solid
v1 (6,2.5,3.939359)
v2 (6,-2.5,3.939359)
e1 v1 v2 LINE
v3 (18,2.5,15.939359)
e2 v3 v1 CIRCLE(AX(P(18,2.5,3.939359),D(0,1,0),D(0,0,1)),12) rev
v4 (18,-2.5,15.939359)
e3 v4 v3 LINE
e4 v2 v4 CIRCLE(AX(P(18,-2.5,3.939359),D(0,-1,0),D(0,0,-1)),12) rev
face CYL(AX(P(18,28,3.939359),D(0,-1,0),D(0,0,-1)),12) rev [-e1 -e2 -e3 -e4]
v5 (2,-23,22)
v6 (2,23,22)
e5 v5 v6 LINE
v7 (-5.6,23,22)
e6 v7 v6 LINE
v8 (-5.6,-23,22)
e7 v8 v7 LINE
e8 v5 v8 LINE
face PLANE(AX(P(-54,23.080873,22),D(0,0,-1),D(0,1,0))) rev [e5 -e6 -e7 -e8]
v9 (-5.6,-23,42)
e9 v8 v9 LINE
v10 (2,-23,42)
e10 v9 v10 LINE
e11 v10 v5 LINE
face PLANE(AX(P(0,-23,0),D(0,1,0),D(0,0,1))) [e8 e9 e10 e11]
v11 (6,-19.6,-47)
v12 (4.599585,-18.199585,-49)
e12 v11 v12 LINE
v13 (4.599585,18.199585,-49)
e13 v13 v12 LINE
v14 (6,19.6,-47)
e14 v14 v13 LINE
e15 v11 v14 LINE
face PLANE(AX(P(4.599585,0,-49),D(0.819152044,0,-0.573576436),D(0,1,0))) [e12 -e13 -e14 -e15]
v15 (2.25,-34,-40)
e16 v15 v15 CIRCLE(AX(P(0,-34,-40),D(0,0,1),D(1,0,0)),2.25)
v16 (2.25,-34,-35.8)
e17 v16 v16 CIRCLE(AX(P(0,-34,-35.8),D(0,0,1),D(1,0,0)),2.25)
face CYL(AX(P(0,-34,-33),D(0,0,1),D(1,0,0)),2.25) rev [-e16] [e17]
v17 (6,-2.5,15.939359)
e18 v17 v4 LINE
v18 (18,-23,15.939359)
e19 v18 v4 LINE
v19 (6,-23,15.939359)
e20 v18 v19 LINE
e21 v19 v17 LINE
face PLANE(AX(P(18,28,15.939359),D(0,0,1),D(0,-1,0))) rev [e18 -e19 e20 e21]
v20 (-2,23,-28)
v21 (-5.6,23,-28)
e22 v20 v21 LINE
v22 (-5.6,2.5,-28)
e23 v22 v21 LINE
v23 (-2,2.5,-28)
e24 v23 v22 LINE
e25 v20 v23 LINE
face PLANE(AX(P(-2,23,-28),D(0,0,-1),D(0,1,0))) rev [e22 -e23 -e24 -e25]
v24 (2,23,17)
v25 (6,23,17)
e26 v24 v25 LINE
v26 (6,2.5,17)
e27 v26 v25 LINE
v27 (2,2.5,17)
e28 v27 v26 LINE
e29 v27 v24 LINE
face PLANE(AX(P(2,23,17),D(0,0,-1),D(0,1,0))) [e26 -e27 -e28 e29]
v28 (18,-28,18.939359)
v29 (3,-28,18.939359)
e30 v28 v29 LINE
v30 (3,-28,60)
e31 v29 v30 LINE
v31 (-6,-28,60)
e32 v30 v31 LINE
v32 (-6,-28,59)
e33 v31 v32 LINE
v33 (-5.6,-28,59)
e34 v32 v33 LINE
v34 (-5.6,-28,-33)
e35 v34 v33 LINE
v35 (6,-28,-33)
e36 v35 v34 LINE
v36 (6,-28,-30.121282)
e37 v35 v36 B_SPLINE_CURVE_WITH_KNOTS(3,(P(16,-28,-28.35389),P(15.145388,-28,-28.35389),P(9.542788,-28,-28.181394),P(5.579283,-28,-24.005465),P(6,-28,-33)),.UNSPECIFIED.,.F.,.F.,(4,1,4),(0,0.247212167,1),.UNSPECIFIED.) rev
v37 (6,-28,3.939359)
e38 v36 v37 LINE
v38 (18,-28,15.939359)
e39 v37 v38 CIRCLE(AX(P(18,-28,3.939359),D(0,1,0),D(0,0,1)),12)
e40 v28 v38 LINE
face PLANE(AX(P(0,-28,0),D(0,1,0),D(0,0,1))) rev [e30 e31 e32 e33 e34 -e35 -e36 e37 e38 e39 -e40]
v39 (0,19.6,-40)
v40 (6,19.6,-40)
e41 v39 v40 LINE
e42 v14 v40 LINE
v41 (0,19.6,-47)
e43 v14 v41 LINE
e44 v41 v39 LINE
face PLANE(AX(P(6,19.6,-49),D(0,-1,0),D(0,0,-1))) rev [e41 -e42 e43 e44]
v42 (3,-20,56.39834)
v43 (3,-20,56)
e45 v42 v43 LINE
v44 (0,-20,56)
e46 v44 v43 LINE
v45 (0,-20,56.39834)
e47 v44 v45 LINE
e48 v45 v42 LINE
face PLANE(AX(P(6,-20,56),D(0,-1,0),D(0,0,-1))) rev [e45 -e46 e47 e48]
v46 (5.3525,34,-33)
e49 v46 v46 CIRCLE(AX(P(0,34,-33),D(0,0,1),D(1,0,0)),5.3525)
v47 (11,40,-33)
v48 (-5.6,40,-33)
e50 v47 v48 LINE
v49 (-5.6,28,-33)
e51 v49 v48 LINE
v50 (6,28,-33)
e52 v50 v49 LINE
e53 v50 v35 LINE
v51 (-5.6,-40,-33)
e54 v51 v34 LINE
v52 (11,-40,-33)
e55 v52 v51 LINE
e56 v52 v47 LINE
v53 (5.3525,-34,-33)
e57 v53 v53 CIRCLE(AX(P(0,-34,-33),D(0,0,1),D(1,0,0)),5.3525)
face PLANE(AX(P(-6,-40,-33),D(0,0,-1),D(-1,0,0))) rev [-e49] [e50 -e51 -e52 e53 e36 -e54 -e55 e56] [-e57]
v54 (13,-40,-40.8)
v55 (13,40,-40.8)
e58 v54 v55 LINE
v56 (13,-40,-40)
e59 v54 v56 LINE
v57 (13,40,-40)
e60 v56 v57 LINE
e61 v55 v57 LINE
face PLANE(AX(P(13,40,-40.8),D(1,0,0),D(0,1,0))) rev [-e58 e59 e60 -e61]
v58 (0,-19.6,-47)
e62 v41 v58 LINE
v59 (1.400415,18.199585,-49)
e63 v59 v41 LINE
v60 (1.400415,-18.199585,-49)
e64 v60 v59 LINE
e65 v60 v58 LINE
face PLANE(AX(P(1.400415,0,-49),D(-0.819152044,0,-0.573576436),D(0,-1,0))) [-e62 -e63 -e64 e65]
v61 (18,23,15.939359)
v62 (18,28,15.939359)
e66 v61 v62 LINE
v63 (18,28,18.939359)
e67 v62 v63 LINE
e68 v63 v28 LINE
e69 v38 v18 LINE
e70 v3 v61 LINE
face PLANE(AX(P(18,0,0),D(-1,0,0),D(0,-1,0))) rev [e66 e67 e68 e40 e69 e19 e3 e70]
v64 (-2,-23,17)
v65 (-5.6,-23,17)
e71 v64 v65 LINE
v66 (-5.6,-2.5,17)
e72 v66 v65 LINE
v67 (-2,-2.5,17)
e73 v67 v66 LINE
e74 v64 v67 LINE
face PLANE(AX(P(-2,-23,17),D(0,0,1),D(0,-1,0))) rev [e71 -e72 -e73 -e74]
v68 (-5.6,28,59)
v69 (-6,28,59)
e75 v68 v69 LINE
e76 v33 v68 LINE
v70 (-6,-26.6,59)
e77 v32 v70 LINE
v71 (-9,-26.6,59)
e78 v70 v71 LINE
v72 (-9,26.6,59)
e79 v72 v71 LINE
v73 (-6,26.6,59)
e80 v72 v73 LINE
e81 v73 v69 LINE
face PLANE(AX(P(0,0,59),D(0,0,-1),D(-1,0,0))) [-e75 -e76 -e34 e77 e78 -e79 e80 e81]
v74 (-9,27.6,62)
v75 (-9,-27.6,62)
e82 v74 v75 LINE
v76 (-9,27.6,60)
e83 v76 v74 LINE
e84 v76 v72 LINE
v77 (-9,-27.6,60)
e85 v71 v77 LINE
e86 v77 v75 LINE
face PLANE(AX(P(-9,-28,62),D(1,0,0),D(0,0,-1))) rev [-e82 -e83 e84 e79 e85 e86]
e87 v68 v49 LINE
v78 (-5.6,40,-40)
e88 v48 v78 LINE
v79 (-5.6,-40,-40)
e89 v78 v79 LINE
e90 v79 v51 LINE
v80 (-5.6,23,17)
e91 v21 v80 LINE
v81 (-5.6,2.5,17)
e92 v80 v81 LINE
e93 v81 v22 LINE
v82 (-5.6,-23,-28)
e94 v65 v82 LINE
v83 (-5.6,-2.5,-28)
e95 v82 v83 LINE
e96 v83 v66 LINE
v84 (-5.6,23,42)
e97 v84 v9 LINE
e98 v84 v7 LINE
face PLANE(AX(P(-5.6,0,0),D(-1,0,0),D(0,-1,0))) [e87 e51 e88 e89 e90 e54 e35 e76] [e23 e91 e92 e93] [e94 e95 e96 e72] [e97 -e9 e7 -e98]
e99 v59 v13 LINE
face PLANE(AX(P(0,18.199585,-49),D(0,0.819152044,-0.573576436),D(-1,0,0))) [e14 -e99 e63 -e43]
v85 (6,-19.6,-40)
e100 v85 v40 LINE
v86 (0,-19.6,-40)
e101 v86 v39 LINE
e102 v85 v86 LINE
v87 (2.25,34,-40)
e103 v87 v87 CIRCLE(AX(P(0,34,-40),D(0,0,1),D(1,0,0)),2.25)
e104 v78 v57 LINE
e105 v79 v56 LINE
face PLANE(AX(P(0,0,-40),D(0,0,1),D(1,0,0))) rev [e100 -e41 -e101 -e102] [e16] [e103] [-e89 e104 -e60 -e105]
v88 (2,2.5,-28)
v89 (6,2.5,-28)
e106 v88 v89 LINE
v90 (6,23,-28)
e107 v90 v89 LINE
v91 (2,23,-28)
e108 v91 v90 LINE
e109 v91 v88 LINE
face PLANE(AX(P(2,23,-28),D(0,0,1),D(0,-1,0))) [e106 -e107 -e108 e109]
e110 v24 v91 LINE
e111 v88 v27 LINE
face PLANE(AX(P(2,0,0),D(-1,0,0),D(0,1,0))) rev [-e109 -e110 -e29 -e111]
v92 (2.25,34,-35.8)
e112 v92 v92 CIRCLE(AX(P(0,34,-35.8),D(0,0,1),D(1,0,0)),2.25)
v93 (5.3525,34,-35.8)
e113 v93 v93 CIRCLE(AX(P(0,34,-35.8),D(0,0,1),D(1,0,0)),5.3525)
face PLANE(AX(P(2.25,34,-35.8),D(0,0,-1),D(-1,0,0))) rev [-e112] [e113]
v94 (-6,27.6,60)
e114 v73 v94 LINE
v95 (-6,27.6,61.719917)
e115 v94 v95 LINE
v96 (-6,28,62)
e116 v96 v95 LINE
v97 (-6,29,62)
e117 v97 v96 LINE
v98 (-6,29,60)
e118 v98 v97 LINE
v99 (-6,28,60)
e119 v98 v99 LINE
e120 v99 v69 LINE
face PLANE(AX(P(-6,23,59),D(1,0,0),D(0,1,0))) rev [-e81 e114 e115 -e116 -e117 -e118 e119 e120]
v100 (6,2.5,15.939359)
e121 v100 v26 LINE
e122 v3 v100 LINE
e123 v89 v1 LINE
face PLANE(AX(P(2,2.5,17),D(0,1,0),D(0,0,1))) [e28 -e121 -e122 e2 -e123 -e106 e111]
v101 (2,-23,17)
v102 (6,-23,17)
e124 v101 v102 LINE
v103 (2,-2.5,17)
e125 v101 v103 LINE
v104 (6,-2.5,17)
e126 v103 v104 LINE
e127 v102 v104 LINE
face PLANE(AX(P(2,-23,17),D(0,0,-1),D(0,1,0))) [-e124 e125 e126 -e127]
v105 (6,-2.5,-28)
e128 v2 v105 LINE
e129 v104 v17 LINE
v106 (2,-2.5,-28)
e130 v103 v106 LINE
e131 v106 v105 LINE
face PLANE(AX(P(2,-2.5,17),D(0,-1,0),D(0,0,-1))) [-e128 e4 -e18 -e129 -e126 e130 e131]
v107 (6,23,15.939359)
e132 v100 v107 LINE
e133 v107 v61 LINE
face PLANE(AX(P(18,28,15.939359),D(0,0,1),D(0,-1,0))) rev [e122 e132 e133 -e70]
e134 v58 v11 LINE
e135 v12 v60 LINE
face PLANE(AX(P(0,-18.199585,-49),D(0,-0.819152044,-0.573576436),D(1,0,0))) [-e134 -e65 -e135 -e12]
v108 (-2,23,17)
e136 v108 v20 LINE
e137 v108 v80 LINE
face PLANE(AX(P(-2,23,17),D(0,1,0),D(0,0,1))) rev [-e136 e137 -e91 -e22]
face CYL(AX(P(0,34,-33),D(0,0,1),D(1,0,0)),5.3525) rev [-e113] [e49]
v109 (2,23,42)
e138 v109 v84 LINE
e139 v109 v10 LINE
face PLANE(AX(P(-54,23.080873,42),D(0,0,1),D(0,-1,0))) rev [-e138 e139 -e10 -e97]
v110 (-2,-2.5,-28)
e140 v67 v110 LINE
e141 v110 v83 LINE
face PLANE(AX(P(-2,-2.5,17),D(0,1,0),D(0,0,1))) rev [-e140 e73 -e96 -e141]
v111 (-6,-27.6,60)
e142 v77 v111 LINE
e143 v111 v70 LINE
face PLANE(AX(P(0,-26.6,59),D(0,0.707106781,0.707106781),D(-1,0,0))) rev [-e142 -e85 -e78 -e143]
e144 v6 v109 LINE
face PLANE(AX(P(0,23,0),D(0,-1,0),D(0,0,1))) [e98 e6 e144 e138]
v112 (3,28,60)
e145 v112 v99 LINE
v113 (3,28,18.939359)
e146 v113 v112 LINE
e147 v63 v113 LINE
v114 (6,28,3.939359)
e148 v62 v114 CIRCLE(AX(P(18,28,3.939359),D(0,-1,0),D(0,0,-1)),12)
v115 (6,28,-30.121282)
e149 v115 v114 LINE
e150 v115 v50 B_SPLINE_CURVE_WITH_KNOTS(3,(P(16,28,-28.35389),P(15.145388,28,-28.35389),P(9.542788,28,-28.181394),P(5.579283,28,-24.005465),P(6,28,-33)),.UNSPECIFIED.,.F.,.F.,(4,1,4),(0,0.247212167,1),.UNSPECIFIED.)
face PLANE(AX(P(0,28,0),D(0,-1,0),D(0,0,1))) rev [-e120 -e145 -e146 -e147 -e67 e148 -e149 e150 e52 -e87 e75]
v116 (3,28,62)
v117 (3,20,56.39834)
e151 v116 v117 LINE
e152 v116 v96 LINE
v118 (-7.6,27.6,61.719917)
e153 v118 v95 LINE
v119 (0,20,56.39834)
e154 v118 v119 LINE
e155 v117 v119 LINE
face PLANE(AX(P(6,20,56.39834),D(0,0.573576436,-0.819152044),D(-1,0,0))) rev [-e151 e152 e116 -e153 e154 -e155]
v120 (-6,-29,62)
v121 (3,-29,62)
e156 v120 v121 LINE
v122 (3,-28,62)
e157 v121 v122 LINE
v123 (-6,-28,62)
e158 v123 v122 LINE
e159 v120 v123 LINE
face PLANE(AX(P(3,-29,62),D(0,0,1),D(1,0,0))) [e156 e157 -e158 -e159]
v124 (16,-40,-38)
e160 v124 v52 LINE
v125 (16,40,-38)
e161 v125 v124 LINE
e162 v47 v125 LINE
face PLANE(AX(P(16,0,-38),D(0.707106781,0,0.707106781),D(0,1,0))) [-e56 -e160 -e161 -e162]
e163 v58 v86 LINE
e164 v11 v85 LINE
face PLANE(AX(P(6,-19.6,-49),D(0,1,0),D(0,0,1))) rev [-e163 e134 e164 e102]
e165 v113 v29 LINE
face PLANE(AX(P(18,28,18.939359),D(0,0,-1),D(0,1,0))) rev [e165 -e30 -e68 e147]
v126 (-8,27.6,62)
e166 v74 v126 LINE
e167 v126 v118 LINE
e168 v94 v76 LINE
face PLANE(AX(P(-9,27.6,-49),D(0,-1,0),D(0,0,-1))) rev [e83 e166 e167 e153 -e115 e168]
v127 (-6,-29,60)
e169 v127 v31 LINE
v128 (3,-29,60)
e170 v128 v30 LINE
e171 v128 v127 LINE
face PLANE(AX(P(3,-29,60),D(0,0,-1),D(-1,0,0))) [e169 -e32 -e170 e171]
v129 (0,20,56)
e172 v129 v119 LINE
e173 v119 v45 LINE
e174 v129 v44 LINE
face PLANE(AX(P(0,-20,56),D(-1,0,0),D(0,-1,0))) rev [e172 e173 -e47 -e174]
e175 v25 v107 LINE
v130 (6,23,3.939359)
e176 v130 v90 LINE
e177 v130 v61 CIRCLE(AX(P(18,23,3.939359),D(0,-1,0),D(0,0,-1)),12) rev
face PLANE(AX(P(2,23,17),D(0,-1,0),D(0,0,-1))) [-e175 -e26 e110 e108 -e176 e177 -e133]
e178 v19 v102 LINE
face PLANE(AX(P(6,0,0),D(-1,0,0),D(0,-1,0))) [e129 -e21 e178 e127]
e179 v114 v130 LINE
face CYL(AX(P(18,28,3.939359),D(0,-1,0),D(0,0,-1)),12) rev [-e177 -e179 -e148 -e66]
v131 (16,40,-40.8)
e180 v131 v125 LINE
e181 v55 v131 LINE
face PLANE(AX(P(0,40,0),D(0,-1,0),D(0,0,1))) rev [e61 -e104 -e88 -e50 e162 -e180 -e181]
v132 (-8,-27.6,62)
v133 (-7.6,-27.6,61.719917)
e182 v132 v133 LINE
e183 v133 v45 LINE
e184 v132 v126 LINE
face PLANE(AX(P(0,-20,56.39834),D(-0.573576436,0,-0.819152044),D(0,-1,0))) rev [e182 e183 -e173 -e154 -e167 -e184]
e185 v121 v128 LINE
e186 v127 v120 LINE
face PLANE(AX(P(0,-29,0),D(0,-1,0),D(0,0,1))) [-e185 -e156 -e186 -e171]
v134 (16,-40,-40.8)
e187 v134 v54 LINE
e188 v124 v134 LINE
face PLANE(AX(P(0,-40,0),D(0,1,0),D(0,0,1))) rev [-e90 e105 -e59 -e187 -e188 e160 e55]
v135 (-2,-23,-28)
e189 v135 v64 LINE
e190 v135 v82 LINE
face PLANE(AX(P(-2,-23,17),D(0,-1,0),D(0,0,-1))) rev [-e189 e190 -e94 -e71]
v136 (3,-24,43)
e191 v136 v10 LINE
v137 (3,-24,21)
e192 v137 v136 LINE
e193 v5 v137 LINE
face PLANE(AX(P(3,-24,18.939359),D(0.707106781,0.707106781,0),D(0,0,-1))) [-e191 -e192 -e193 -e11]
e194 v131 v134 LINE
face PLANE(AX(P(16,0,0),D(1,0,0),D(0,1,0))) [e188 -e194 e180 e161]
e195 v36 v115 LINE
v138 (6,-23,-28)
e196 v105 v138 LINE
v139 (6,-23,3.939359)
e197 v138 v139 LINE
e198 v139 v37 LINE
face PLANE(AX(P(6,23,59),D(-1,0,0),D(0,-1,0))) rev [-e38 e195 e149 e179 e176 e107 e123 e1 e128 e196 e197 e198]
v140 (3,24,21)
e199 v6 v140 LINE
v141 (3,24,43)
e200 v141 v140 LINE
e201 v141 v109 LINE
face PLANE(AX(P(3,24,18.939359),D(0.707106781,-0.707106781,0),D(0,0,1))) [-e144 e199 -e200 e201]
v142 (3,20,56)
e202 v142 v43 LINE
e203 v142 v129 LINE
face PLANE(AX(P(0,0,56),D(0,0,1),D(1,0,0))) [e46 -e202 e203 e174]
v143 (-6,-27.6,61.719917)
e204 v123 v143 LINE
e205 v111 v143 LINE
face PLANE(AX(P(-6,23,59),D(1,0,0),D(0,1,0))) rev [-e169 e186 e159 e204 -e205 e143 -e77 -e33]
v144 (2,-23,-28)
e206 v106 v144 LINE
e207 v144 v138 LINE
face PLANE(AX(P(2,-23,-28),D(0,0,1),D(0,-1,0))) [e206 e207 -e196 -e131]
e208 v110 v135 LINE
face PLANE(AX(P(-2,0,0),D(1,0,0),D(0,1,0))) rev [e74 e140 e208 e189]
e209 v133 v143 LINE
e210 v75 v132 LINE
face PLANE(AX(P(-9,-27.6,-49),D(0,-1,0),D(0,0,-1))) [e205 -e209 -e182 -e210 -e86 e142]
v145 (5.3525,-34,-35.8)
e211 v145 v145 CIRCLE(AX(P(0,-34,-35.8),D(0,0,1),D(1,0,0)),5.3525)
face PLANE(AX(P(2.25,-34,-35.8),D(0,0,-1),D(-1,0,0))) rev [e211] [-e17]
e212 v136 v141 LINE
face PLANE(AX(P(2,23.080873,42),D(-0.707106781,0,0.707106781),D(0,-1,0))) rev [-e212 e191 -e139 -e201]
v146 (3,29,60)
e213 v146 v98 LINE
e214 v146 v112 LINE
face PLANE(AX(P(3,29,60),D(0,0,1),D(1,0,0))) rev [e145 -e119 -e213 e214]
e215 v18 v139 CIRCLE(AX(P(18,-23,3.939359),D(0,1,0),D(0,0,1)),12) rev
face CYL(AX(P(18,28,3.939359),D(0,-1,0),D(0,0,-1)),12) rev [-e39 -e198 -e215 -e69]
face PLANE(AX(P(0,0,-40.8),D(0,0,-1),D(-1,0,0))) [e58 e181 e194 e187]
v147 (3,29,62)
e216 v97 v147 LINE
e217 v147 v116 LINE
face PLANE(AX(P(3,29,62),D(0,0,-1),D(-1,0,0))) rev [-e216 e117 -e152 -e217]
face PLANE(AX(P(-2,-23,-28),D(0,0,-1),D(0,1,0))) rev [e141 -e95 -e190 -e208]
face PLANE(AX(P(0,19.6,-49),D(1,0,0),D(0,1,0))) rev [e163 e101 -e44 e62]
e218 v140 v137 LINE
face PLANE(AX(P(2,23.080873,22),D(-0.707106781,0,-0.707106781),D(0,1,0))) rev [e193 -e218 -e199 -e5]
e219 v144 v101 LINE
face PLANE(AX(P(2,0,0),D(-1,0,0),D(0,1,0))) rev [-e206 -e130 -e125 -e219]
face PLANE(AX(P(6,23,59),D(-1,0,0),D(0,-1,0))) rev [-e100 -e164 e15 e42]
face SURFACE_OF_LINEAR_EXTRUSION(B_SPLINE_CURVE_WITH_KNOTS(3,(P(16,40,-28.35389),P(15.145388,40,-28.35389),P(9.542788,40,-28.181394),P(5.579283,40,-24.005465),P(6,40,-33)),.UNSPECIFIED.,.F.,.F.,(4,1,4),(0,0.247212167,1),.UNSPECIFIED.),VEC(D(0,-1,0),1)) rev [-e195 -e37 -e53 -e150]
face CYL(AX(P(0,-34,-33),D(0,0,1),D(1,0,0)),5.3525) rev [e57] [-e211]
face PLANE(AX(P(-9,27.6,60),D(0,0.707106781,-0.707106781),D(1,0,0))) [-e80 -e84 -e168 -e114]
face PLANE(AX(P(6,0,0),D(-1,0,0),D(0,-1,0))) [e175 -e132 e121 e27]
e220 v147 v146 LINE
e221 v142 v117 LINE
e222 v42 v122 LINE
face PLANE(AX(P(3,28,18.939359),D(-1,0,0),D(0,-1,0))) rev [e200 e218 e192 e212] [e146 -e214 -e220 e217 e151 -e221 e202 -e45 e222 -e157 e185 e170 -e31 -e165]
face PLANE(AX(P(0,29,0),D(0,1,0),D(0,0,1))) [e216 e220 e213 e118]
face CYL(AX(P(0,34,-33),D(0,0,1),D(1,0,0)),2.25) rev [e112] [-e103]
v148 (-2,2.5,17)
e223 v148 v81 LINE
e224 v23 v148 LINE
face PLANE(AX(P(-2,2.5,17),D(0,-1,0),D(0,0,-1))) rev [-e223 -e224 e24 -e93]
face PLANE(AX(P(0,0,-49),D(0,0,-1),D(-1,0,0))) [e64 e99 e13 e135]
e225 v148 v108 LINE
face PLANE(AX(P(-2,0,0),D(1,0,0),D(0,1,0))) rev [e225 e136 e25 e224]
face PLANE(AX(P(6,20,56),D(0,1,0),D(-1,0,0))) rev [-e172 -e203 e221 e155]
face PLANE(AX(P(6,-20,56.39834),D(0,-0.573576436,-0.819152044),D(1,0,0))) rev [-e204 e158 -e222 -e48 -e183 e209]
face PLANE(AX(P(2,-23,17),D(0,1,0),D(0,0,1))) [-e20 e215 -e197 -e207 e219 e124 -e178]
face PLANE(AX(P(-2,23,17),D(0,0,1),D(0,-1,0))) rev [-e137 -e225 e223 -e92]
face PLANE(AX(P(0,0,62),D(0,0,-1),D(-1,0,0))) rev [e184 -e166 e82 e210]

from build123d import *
from OCP.BRepFilletAPI import BRepFilletAPI_MakeChamfer

# Parameters (mm, degrees)
SKETCH_1_W          = 12
SKETCH_1_H          = 46
EXTRUDE_1_DEPTH     = 59
SKETCH_2_W          = 20
SKETCH_2_H          = 46.080872769
CUT_EXTRUDE_1_DEPTH = 60
SKETCH_3_W          = 12
SKETCH_3_H          = 59
EXTRUDE_2_DEPTH     = 5
SKETCH_4_W          = 12
SKETCH_4_H          = 56
EXTRUDE_3_DEPTH     = 40
SKETCH_5_W          = 12
SKETCH_5_H          = 7
EXTRUDE_4_DEPTH     = 12
M4_A_1_D            = 4.5
M4_A_1_CBORE_D      = 10.705
M4_A_1_CBORE_DEPTH  = 2.8
SKETCH_8_W          = 15
SKETCH_8_H          = 56
EXTRUDE_5_DEPTH     = 3
SKETCH_9_W          = 6
SKETCH_9_H          = 40
CUT_EXTRUDE_2_DEPTH = 6
CHAMFER_1_SIZE      = 8
CHAMFER_1_SIZE_2    = 5.601660306
SKETCH_10_W         = 6
SKETCH_10_H         = 39.2
EXTRUDE_6_DEPTH     = 9
SKETCH_11_W         = 3
SKETCH_11_H         = 0.4
CUT_EXTRUDE_3_DEPTH = 119.330046903
CHAMFER_2_SIZE      = 1
CHAMFER_3_SIZE      = 2
CHAMFER_3_SIZE2     = 1.400415076
SKETCH_12_W         = 45
SKETCH_12_H         = 20.5
CUT_EXTRUDE_4_DEPTH = 4
SKETCH_14_W         = 7
SKETCH_14_H         = 80
EXTRUDE_7_DEPTH     = 10
CUT_EXTRUDE_5_DEPTH = 103.46950766
SKETCH_16_W         = 3
SKETCH_16_H         = 56
EXTRUDE_8_DEPTH     = 12
CHAMFER_5_SIZE      = 5
CUT_EXTRUDE_START   = -43.060641
SKETCH_17_W         = 3
SKETCH_17_H         = 56
CUT_EXTRUDE_6_DEPTH = 43.060641
CHAMFER_4_SIZE      = 1
FILLET_1_R          = 12
SKETCH_22_W         = 3
SKETCH_22_H         = 80
EXTRUDE_11_DEPTH    = 0.8
SKETCH_24_W         = 9
SKETCH_24_H         = 2
EXTRUDE_13_DEPTH    = 1
SKETCH_26_W         = 99
SKETCH_26_H         = 80
CUT_EXTRUDE_8_DEPTH = 0.4


with BuildPart() as part:
    # 스케치1 → 보스-돌출1 (new body)
    with BuildSketch(Plane.XY):
        Rectangle(SKETCH_1_W, SKETCH_1_H)
    extrude(amount=EXTRUDE_1_DEPTH)

    # 스케치2 → 컷-돌출1 (cut)
    with BuildSketch(Plane(origin=(6, 0, 0), x_dir=(0, 0, -1), z_dir=(1, 0, 0))):
        with Locations((-32, 0.040436385)):
            Rectangle(SKETCH_2_W, SKETCH_2_H)
    extrude(amount=-CUT_EXTRUDE_1_DEPTH, mode=Mode.SUBTRACT)


with BuildPart() as cut_extrude_1_piece_1:
    # of the separate pieces the step leaves, piece 1, a body of its own (cut_extrude_1_pieces)
    add(part.part.solids().sort_by_distance((-6, 23, 0))[0])



with BuildPart() as cut_extrude_1_piece_2:
    # of the separate pieces the step leaves, piece 2, a body of its own (cut_extrude_1_pieces)
    add(part.part.solids().sort_by_distance((6, 23, 42))[0])


with BuildPart() as cut_extrude_1_piece_1_1:
    add(cut_extrude_1_piece_1.part)

    add(cut_extrude_1_piece_2.part)  # 보스-돌출2 merges 컷-돌출1 piece 2
    # 스케치3 → 보스-돌출2 (add)
    with BuildSketch(Plane.XZ.offset(23)):
        with Locations((0, 29.5)):
            Rectangle(SKETCH_3_W, SKETCH_3_H)
    extrude_2 = extrude(amount=EXTRUDE_2_DEPTH)

    # 대칭 복사1: 보스-돌출2 across plane
    add(extrude_2.mirror(Plane.ZX))

    # 스케치4 → 보스-돌출3 (add)
    with BuildSketch(Plane(origin=(0, 0, 0), x_dir=(-1, 0, 0), z_dir=(0, 0, -1))):
        Rectangle(SKETCH_4_W, SKETCH_4_H)
    extrude(amount=EXTRUDE_3_DEPTH)

    # 스케치5 → 보스-돌출4 (add)
    with BuildSketch(Plane.XZ.offset(28)):
        with Locations((0, -36.5)):
            Rectangle(SKETCH_5_W, SKETCH_5_H)
    extrude_4 = extrude(amount=EXTRUDE_4_DEPTH)

    # 대칭 복사2: 보스-돌출4 across plane
    add(extrude_4.mirror(Plane.ZX))

    # M4 육각 머리 볼트용 카운터보어 (A 등급)1 (through all)
    with Locations(Plane.XY.offset(-33)):
        with Locations((0, -34), (0, 34)):
            CounterBoreHole(M4_A_1_D / 2, M4_A_1_CBORE_D / 2, M4_A_1_CBORE_DEPTH)

    # 스케치8 → 보스-돌출5 (add)
    with BuildSketch(Plane.XY.offset(59)):
        with Locations((-1.5, 0)):
            Rectangle(SKETCH_8_W, SKETCH_8_H)
    extrude(amount=EXTRUDE_5_DEPTH)

    # 스케치9 → 컷-돌출2 (cut)
    with BuildSketch(Plane.XY.offset(62)):
        with Locations((3, 0)):
            Rectangle(SKETCH_9_W, SKETCH_9_H)
    extrude(amount=-CUT_EXTRUDE_2_DEPTH, mode=Mode.SUBTRACT)

    # 모따기1
    chamfer_1_edges_1 = [cut_extrude_1_piece_1_1.edges().sort_by_distance(p)[0] for p in [
        (0, 0, 62),
    ]]
    chamfer_1_side_1 = [cut_extrude_1_piece_1_1.faces().sort_by_distance(p)[0] for p in [
        (-0.112033206, 0, 62),
    ]]
    chamfer_1_edges_2 = [cut_extrude_1_piece_1_1.edges().sort_by_distance(p)[0] for p in [
        (3, 20, 62),
    ]]
    chamfer_1_side_2 = [cut_extrude_1_piece_1_1.faces().sort_by_distance(p)[0] for p in [
        (3, 20.112033206, 62),
    ]]
    chamfer_1_edges_3 = [cut_extrude_1_piece_1_1.edges().sort_by_distance(p)[0] for p in [
        (3, -20, 62),
    ]]
    chamfer_1_side_3 = [cut_extrude_1_piece_1_1.faces().sort_by_distance(p)[0] for p in [
        (3, -20.112033206, 62),
    ]]
    chamfer_1 = BRepFilletAPI_MakeChamfer(cut_extrude_1_piece_1_1.part.solid().wrapped)
    for e in chamfer_1_edges_1:
        chamfer_1.Add(CHAMFER_1_SIZE - 0.0001, CHAMFER_1_SIZE_2 - 0.0001, e.wrapped, chamfer_1_side_1[0].wrapped)
    for e in chamfer_1_edges_2:
        chamfer_1.Add(CHAMFER_1_SIZE - 0.0001, CHAMFER_1_SIZE_2 - 0.0001, e.wrapped, chamfer_1_side_2[0].wrapped)
    for e in chamfer_1_edges_3:
        chamfer_1.Add(CHAMFER_1_SIZE - 0.0001, CHAMFER_1_SIZE_2 - 0.0001, e.wrapped, chamfer_1_side_3[0].wrapped)
    add(Compound.cast(chamfer_1.Shape()), mode=Mode.REPLACE)  # a hair under: the kernel refuses the full size

    # 스케치10 → 보스-돌출6 (add)
    with BuildSketch(Plane(origin=(0, 0, -40), x_dir=(-1, 0, 0), z_dir=(0, 0, -1))):
        with Locations((-3, 0)):
            Rectangle(SKETCH_10_W, SKETCH_10_H)
    extrude(amount=EXTRUDE_6_DEPTH)

    # 스케치11 → 컷-돌출3 (cut, through all)
    with BuildSketch(Plane.XY.offset(62)):
        with Locations((-7.5, 27.8)):
            Rectangle(SKETCH_11_W, SKETCH_11_H)
        with Locations((-7.5, -27.8)):
            Rectangle(SKETCH_11_W, SKETCH_11_H)
    extrude(amount=-CUT_EXTRUDE_3_DEPTH, mode=Mode.SUBTRACT)


with BuildPart() as cut_extrude_3_kept_piece:
    # of the separate pieces the step leaves, the one the design keeps (cut_extrude_3_pieces_kept)
    add(cut_extrude_1_piece_1_1.part.solids().sort_by_distance((6, -27.9999, 62))[0])

    # 모따기2
    chamfer_2_edges = [cut_extrude_3_kept_piece.edges().sort_by_distance(p)[0] for p in [
        (-7.5, -27.6, 59),
        (-7.5, 27.6, 59),
    ]]
    chamfer(chamfer_2_edges, length=CHAMFER_2_SIZE)

    # 모따기3: one chamfer whose edges measure the first distance from different faces: ONE call of the kernel's chamfer builder (chamfer() names one face for all edges)
    chamfer_3_edges_1 = [cut_extrude_3_kept_piece.edges().sort_by_distance(p)[0] for p in [
        (6, 0, -49),
    ]]
    chamfer_3_side_1 = [cut_extrude_3_kept_piece.faces().sort_by_distance(p)[0] for p in [
        (6, 0, -1.052959329),
    ]]
    chamfer_3_edges_2 = [cut_extrude_3_kept_piece.edges().sort_by_distance(p)[0] for p in [
        (3, -19.6, -49),
    ]]
    chamfer_3_side_2 = [cut_extrude_3_kept_piece.faces().sort_by_distance(p)[0] for p in [
        (3, -19.6, -44.5),
    ]]
    chamfer_3_edges_3 = [cut_extrude_3_kept_piece.edges().sort_by_distance(p)[0] for p in [
        (0, 0, -49),
    ]]
    chamfer_3_side_3 = [cut_extrude_3_kept_piece.faces().sort_by_distance(p)[0] for p in [
        (0, 0, -44.5),
    ]]
    chamfer_3_edges_4 = [cut_extrude_3_kept_piece.edges().sort_by_distance(p)[0] for p in [
        (3, 19.6, -49),
    ]]
    chamfer_3_side_4 = [cut_extrude_3_kept_piece.faces().sort_by_distance(p)[0] for p in [
        (3, 19.6, -44.5),
    ]]
    chamfer_3 = BRepFilletAPI_MakeChamfer(cut_extrude_3_kept_piece.part.solid().wrapped)
    for e in chamfer_3_edges_1:
        chamfer_3.Add(CHAMFER_3_SIZE, CHAMFER_3_SIZE2, e.wrapped, chamfer_3_side_1[0].wrapped)  # the first distance lies on this face
    for e in chamfer_3_edges_2:
        chamfer_3.Add(CHAMFER_3_SIZE, CHAMFER_3_SIZE2, e.wrapped, chamfer_3_side_2[0].wrapped)  # the first distance lies on this face
    for e in chamfer_3_edges_3:
        chamfer_3.Add(CHAMFER_3_SIZE, CHAMFER_3_SIZE2, e.wrapped, chamfer_3_side_3[0].wrapped)  # the first distance lies on this face
    for e in chamfer_3_edges_4:
        chamfer_3.Add(CHAMFER_3_SIZE, CHAMFER_3_SIZE2, e.wrapped, chamfer_3_side_4[0].wrapped)  # the first distance lies on this face
    add(Compound.cast(chamfer_3.Shape()), mode=Mode.REPLACE)

    # 스케치12 → 컷-돌출4 (cut)
    with BuildSketch(Plane.ZY.offset(6)):
        with Locations((-5.5, 12.75)):
            Rectangle(SKETCH_12_W, SKETCH_12_H)
        with Locations((-5.5, -12.75)):
            Rectangle(SKETCH_12_W, SKETCH_12_H)
    cut_extrude_4 = extrude(amount=-CUT_EXTRUDE_4_DEPTH, mode=Mode.SUBTRACT)

    # 대칭 복사3: 컷-돌출4 across plane
    add(cut_extrude_4.mirror(Plane.ZY), mode=Mode.SUBTRACT)

    # 스케치14 → 보스-돌출7 (add)
    with BuildSketch(Plane(origin=(6, 0, 0), x_dir=(0, 0, -1), z_dir=(1, 0, 0))):
        with Locations((36.5, 0)):
            Rectangle(SKETCH_14_W, SKETCH_14_H)
    extrude(amount=EXTRUDE_7_DEPTH)

    # 스케치15 → 컷-돌출5 (cut, through all)
    with BuildSketch(Plane.XZ.offset(40)):
        with BuildLine():
            Line((6, -33), (16, -33))
            Line((16, -33), (16, -28.353890031))
            add(Edge.make_bspline(
                [(6, -33), (5.579283, -24.005465365), (9.542787604, -28.181394392), (15.145388019, -28.353890031), (16, -28.353890031)],
                knots=[0, 0, 0, 0, 0.752787833, 1, 1, 1, 1], degree=3))
        make_face()
    extrude(amount=-CUT_EXTRUDE_5_DEPTH, mode=Mode.SUBTRACT)

    # 스케치16 → 보스-돌출8 (add)
    with BuildSketch(Plane(origin=(6, 0, 0), x_dir=(0, 0, -1), z_dir=(1, 0, 0))):
        with Locations((-17.43935887, 0)):
            Rectangle(SKETCH_16_W, SKETCH_16_H)
    extrude(amount=EXTRUDE_8_DEPTH)

    # 모따기5
    chamfer_5_edges = [cut_extrude_3_kept_piece.edges().sort_by_distance(p)[0] for p in [
        (16, 0, -33),
    ]]
    chamfer(chamfer_5_edges, length=CHAMFER_5_SIZE)

    # 스케치17 → 컷-돌출6 (cut)
    with BuildSketch(Plane.XY.offset(62).offset(CUT_EXTRUDE_START)):
        with Locations((4.5, 0)):
            Rectangle(SKETCH_17_W, SKETCH_17_H)
    extrude(amount=CUT_EXTRUDE_6_DEPTH, mode=Mode.SUBTRACT)

    # 모따기4
    chamfer_4_edges = [cut_extrude_3_kept_piece.edges().sort_by_distance(p)[0] for p in [
        (3, -23, 32),
        (3, 23, 32),
        (3, 0, 22),
        (3, 0, 42),
    ]]
    chamfer(chamfer_4_edges, length=CHAMFER_4_SIZE)

    # 필렛1
    fillet_1_edges = [cut_extrude_3_kept_piece.edges().sort_by_distance(p)[0] for p in [
        (6, -25.5, 15.93935887),
        (6, 0, 15.93935887),
        (6, 25.5, 15.93935887),
    ]]
    fillet(fillet_1_edges, radius=FILLET_1_R - 0.0001)  # a hair under: the kernel refuses the full size

    # 스케치22 → 보스-돌출11 (add)
    with BuildSketch(Plane(origin=(0, 0, -40), x_dir=(-1, 0, 0), z_dir=(0, 0, -1))):
        with Locations((-14.5, 0)):
            Rectangle(SKETCH_22_W, SKETCH_22_H)
    extrude(amount=EXTRUDE_11_DEPTH)

    # 스케치24 → 보스-돌출13 (add)
    with BuildSketch(Plane(origin=(0, 28, 0), x_dir=(1, 0, 0), z_dir=(0, 1, 0))):
        with Locations((-1.5, -61)):
            Rectangle(SKETCH_24_W, SKETCH_24_H)
    extrude_13 = extrude(amount=EXTRUDE_13_DEPTH)

    # 대칭 복사4: 보스-돌출13 across plane
    add(extrude_13.mirror(Plane.ZX))

    # 스케치26 → 컷-돌출8 (cut)
    with BuildSketch(Plane.ZY.offset(6)):
        with Locations((9.5, 0)):
            Rectangle(SKETCH_26_W, SKETCH_26_H)
    extrude(amount=-CUT_EXTRUDE_8_DEPTH, mode=Mode.SUBTRACT)


solid = cut_extrude_3_kept_piece.part
